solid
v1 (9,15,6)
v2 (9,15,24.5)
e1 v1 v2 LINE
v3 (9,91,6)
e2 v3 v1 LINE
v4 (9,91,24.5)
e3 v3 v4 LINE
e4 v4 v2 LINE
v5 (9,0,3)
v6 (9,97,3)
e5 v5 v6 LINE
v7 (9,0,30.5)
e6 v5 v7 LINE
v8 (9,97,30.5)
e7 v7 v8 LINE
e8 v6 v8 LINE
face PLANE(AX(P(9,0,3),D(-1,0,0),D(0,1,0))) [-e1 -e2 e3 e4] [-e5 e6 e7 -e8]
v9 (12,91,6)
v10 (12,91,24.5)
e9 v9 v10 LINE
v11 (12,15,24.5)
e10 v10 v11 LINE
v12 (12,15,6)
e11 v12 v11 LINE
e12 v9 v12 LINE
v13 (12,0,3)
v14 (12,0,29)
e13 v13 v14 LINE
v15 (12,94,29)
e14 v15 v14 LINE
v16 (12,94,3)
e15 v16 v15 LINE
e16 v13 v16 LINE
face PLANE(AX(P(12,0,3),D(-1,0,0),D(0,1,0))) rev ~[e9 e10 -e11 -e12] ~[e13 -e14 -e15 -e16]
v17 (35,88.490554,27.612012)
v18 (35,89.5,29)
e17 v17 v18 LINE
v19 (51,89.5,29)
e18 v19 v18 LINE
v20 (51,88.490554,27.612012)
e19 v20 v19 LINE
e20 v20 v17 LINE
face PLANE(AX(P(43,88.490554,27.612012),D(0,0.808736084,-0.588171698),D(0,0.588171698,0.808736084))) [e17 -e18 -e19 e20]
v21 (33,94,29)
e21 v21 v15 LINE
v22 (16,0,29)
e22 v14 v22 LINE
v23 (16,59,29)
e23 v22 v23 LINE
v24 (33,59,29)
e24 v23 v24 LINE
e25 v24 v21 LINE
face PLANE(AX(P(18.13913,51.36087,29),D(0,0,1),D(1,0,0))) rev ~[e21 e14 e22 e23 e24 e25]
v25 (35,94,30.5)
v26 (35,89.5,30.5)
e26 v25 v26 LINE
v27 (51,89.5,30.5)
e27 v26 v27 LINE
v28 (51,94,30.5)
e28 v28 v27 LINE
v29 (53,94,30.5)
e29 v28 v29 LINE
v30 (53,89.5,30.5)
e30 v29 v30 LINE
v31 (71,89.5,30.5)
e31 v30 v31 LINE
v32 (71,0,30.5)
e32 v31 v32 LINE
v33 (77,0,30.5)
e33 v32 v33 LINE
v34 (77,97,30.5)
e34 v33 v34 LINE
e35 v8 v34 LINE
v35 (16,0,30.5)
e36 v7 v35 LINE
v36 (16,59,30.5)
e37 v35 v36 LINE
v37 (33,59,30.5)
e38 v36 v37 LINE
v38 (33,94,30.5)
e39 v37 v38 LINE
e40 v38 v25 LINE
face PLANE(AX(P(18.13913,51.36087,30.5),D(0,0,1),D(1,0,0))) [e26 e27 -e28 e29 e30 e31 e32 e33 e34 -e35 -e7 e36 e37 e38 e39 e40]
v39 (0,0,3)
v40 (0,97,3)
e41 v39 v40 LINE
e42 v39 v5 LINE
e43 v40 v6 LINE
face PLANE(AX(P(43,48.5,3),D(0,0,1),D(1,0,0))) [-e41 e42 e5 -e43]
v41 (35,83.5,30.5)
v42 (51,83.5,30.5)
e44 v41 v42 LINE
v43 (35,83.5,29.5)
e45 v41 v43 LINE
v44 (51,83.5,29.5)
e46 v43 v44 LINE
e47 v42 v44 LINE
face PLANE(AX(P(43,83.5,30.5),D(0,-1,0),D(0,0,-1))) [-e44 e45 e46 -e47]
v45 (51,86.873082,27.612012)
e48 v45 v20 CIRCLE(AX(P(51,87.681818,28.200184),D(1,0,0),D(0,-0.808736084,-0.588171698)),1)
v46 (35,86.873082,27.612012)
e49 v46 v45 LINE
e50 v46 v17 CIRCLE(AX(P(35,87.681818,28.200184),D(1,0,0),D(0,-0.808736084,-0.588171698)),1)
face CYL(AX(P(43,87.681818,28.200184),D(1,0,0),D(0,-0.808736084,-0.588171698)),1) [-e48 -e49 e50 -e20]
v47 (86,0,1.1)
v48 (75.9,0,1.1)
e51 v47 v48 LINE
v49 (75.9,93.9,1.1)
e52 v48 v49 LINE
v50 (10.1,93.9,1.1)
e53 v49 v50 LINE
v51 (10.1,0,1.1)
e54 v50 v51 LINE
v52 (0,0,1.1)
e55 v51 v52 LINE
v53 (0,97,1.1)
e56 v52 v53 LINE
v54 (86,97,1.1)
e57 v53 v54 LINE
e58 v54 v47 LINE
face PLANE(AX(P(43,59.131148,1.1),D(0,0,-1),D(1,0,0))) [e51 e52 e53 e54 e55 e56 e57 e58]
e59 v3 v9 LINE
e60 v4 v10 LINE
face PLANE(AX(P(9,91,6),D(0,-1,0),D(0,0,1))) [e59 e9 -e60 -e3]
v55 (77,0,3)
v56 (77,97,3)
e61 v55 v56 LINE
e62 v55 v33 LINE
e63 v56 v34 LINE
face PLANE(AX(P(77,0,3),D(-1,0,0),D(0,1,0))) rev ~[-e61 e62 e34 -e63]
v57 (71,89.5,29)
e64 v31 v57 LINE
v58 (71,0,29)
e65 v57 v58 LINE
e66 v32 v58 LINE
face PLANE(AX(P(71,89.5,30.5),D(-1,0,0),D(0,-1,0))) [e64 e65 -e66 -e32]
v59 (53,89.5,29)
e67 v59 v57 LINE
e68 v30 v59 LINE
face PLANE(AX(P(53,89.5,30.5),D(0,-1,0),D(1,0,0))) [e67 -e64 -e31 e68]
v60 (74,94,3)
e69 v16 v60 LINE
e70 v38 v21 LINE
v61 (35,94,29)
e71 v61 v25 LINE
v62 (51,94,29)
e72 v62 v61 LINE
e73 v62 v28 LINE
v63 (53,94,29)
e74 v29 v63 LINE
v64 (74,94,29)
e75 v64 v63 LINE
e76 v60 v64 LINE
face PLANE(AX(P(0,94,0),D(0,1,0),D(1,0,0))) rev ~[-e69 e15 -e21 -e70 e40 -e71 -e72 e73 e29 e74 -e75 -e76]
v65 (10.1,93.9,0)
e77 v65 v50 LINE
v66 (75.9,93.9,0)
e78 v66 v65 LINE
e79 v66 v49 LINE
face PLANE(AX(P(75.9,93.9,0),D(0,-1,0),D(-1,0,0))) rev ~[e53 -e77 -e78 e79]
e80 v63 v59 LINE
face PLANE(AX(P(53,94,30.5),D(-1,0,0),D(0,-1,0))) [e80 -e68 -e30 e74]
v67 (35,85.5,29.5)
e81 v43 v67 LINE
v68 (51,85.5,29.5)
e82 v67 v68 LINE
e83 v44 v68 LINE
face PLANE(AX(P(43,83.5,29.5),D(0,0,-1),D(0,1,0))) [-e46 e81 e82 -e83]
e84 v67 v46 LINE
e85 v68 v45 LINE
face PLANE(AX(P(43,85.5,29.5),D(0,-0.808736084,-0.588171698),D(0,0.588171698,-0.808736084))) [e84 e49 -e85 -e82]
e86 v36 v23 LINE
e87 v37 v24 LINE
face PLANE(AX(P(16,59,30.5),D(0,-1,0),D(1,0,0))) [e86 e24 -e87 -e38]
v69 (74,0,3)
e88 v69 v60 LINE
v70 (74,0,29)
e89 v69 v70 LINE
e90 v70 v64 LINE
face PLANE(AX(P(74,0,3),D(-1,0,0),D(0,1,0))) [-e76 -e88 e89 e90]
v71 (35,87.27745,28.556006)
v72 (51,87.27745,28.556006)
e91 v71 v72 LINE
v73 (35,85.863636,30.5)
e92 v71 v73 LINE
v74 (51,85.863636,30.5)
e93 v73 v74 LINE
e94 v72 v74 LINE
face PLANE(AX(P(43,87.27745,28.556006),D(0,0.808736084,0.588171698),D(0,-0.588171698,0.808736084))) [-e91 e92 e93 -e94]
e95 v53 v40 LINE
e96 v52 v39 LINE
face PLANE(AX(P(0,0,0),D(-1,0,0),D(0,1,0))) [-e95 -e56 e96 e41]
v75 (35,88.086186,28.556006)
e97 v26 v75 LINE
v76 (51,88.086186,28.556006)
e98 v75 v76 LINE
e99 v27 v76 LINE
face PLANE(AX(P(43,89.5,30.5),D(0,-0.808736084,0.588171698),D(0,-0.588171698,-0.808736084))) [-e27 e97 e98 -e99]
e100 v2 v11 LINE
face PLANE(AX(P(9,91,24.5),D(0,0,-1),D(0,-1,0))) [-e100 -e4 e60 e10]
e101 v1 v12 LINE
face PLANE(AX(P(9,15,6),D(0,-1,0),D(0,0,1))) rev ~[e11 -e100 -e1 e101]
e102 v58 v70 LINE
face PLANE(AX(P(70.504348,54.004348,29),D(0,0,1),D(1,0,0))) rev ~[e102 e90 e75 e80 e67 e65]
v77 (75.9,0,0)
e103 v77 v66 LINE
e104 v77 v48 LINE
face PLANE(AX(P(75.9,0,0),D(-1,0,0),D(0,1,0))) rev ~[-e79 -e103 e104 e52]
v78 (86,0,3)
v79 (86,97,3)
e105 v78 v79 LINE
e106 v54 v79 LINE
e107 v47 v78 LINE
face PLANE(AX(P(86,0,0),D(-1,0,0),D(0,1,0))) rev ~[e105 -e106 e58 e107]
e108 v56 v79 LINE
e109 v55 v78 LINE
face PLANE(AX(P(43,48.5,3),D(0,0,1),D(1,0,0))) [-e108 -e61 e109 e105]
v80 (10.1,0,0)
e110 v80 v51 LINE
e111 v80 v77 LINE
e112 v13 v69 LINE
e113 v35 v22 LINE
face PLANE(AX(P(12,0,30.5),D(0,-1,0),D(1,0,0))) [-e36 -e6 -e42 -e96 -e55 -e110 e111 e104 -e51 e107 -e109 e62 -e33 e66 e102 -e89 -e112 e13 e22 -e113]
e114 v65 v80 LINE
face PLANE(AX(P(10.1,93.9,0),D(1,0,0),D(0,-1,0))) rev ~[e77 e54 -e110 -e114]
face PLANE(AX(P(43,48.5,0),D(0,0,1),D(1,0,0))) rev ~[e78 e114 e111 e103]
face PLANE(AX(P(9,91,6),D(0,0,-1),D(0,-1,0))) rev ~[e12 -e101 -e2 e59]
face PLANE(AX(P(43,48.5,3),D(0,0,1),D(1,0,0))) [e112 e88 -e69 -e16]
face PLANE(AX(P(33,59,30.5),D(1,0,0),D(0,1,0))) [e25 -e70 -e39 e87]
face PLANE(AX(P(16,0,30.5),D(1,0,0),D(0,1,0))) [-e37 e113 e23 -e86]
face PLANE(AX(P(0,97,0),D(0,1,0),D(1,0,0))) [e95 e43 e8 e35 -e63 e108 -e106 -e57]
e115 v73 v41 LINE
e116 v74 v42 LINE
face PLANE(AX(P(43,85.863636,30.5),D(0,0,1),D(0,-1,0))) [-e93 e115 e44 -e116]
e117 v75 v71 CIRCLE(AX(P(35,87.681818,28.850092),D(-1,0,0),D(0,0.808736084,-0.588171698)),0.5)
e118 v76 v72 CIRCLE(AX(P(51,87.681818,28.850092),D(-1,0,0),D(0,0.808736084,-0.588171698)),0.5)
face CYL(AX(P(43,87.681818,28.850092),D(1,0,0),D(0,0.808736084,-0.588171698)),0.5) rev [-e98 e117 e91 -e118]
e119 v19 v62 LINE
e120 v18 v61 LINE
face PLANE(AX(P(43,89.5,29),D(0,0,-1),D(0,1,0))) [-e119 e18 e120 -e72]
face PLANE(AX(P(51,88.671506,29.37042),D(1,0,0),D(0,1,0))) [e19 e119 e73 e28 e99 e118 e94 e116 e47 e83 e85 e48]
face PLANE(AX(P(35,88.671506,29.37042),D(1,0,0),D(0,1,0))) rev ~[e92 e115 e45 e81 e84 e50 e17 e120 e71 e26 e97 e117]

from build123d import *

# Parameters (mm, degrees)
F0_W        = 86
F0_H        = 97
F1_DEPTH    = 3
F2_W        = 68
F2_H        = 97
F3_DEPTH    = 27.5
F4_T        = 3
F4_T3_DEPTH = 103
F7_DEPTH    = 8
F9_DEPTH    = 1.5
F10_W       = 76
F10_H       = 18.5
F11_DEPTH   = 3
F13_DEPTH   = 1.1


# Not quite as in the source:
# - a shell that OpenCascade refuses in one call is made with other operations: the cavity is built on its own and cut out


with BuildPart() as f1:
    # F0 (on Top) → F1 (new body)
    with BuildSketch(Plane.XY):
        with Locations((43, 48.5)):
            Rectangle(F0_W, F0_H)
    extrude(amount=F1_DEPTH)

    # F2 (on face) → F3 (join)
    with BuildSketch(Plane.XY.offset(3)):
        with Locations((43, 48.5)):
            Rectangle(F2_W, F2_H)
    extrude(amount=F3_DEPTH)

    # F4: shell of thickness 3, made by hand


with BuildPart() as f4_core1:
    # F4_t2: copy of F1
    add(f1.part)

    # the walls: a layer under each face that stays
    f4_faces = [f4_core1.faces().sort_by_distance(p)[0] for p in [
        (43, 97, 15.25),
        (86, 48.5, 1.5),
        (0, 48.5, 1.5),
        (43, 48.5, 0),
        (81.5, 48.5, 3),
        (4.5, 48.5, 3),
        (77, 48.5, 16.75),
        (9, 48.5, 16.75),
    ]]
    thicken(f4_faces, amount=-F4_T, mode=Mode.SUBTRACT)

    # F4_s4 → F4_t3 (cut)
    with BuildSketch(Plane.XZ.offset(-100)):
        Polygon((77.03, 3.03), (77, 0), (74, 0), (74, 3), align=None)
        Polygon((8.97, 3.03), (9, 0), (12, 0), (12, 3), align=None)
    extrude(amount=F4_T3_DEPTH, mode=Mode.SUBTRACT)


with BuildPart() as f1_1:
    add(f1.part)

    # what is left inside the walls is the cavity
    f4_cavity = [f4_core1.part.solids().sort_by_distance(p)[0] for p in [
        (43, 31.333333, 3.03),
    ]]
    add(f4_cavity, mode=Mode.SUBTRACT)

    # F6 (on mid) → F7 (join, symmetric)
    with BuildSketch(Plane.YZ.offset(43)):
        with BuildLine():
            Line((94, 29), (94, 30.5))
            Line((94, 30.5), (89.5, 30.5))
            Line((89.5, 30.5), (88.086186224, 28.556006058))
            ThreePointArc((88.086186224, 28.556006058), (87.6818181818, 28.3500919068), (87.2774501397, 28.556006058))
            Line((87.2774501397, 28.556006058), (85.8636363636, 30.5))
            Line((85.8636363636, 30.5), (83.5, 30.5))
            Line((83.5, 30.5), (83.5, 29.5))
            Line((83.5, 29.5), (85.5, 29.5))
            Line((85.5, 29.5), (86.8730820975, 27.6120121159))
            ThreePointArc((86.8730820975, 27.6120121159), (87.6818181818, 27.2001838136), (88.4905542661, 27.6120121159))
            Line((88.4905542661, 27.6120121159), (89.5, 29))
            Line((89.5, 29), (94, 29))
        make_face()
    extrude(amount=F7_DEPTH, both=True)

    # F8 (on face) → F9 (join)
    with BuildSketch(Plane.XY.offset(30.5)):
        Polygon((33, 59), (33, 94), (12, 94), (12, 59), (12, 0), (16, 0), (16, 59), align=None)
        Polygon((59, 94), (53, 94), (53, 89.5), (71, 89.5), (71, 0), (74, 0), (74, 89.5), (74, 94), (71, 94), align=None)
    extrude(amount=-F9_DEPTH)

    # F10 (on face) → F11 (cut, through all)
    with BuildSketch(Plane(origin=(9, 0, 0), x_dir=(0, -1, 0), z_dir=(-1, 0, 0))):
        with Locations((-53, 15.25)):
            Rectangle(F10_W, F10_H)
    extrude(amount=-F11_DEPTH, mode=Mode.SUBTRACT)

    # F12 (on face) → F13 (cut)
    with BuildSketch(Plane(origin=(0, 0, 0), x_dir=(1, 0, 0), z_dir=(0, 0, -1))):
        Polygon((0, 0), (0, -97), (10.1, -97), (75.9, -97), (86, -97), (86, 0), (75.9, 0), (75.9, -93.9), (10.1, -93.9), (10.1, 0), align=None)
    extrude(amount=-F13_DEPTH, mode=Mode.SUBTRACT)


solid = f1_1.part
